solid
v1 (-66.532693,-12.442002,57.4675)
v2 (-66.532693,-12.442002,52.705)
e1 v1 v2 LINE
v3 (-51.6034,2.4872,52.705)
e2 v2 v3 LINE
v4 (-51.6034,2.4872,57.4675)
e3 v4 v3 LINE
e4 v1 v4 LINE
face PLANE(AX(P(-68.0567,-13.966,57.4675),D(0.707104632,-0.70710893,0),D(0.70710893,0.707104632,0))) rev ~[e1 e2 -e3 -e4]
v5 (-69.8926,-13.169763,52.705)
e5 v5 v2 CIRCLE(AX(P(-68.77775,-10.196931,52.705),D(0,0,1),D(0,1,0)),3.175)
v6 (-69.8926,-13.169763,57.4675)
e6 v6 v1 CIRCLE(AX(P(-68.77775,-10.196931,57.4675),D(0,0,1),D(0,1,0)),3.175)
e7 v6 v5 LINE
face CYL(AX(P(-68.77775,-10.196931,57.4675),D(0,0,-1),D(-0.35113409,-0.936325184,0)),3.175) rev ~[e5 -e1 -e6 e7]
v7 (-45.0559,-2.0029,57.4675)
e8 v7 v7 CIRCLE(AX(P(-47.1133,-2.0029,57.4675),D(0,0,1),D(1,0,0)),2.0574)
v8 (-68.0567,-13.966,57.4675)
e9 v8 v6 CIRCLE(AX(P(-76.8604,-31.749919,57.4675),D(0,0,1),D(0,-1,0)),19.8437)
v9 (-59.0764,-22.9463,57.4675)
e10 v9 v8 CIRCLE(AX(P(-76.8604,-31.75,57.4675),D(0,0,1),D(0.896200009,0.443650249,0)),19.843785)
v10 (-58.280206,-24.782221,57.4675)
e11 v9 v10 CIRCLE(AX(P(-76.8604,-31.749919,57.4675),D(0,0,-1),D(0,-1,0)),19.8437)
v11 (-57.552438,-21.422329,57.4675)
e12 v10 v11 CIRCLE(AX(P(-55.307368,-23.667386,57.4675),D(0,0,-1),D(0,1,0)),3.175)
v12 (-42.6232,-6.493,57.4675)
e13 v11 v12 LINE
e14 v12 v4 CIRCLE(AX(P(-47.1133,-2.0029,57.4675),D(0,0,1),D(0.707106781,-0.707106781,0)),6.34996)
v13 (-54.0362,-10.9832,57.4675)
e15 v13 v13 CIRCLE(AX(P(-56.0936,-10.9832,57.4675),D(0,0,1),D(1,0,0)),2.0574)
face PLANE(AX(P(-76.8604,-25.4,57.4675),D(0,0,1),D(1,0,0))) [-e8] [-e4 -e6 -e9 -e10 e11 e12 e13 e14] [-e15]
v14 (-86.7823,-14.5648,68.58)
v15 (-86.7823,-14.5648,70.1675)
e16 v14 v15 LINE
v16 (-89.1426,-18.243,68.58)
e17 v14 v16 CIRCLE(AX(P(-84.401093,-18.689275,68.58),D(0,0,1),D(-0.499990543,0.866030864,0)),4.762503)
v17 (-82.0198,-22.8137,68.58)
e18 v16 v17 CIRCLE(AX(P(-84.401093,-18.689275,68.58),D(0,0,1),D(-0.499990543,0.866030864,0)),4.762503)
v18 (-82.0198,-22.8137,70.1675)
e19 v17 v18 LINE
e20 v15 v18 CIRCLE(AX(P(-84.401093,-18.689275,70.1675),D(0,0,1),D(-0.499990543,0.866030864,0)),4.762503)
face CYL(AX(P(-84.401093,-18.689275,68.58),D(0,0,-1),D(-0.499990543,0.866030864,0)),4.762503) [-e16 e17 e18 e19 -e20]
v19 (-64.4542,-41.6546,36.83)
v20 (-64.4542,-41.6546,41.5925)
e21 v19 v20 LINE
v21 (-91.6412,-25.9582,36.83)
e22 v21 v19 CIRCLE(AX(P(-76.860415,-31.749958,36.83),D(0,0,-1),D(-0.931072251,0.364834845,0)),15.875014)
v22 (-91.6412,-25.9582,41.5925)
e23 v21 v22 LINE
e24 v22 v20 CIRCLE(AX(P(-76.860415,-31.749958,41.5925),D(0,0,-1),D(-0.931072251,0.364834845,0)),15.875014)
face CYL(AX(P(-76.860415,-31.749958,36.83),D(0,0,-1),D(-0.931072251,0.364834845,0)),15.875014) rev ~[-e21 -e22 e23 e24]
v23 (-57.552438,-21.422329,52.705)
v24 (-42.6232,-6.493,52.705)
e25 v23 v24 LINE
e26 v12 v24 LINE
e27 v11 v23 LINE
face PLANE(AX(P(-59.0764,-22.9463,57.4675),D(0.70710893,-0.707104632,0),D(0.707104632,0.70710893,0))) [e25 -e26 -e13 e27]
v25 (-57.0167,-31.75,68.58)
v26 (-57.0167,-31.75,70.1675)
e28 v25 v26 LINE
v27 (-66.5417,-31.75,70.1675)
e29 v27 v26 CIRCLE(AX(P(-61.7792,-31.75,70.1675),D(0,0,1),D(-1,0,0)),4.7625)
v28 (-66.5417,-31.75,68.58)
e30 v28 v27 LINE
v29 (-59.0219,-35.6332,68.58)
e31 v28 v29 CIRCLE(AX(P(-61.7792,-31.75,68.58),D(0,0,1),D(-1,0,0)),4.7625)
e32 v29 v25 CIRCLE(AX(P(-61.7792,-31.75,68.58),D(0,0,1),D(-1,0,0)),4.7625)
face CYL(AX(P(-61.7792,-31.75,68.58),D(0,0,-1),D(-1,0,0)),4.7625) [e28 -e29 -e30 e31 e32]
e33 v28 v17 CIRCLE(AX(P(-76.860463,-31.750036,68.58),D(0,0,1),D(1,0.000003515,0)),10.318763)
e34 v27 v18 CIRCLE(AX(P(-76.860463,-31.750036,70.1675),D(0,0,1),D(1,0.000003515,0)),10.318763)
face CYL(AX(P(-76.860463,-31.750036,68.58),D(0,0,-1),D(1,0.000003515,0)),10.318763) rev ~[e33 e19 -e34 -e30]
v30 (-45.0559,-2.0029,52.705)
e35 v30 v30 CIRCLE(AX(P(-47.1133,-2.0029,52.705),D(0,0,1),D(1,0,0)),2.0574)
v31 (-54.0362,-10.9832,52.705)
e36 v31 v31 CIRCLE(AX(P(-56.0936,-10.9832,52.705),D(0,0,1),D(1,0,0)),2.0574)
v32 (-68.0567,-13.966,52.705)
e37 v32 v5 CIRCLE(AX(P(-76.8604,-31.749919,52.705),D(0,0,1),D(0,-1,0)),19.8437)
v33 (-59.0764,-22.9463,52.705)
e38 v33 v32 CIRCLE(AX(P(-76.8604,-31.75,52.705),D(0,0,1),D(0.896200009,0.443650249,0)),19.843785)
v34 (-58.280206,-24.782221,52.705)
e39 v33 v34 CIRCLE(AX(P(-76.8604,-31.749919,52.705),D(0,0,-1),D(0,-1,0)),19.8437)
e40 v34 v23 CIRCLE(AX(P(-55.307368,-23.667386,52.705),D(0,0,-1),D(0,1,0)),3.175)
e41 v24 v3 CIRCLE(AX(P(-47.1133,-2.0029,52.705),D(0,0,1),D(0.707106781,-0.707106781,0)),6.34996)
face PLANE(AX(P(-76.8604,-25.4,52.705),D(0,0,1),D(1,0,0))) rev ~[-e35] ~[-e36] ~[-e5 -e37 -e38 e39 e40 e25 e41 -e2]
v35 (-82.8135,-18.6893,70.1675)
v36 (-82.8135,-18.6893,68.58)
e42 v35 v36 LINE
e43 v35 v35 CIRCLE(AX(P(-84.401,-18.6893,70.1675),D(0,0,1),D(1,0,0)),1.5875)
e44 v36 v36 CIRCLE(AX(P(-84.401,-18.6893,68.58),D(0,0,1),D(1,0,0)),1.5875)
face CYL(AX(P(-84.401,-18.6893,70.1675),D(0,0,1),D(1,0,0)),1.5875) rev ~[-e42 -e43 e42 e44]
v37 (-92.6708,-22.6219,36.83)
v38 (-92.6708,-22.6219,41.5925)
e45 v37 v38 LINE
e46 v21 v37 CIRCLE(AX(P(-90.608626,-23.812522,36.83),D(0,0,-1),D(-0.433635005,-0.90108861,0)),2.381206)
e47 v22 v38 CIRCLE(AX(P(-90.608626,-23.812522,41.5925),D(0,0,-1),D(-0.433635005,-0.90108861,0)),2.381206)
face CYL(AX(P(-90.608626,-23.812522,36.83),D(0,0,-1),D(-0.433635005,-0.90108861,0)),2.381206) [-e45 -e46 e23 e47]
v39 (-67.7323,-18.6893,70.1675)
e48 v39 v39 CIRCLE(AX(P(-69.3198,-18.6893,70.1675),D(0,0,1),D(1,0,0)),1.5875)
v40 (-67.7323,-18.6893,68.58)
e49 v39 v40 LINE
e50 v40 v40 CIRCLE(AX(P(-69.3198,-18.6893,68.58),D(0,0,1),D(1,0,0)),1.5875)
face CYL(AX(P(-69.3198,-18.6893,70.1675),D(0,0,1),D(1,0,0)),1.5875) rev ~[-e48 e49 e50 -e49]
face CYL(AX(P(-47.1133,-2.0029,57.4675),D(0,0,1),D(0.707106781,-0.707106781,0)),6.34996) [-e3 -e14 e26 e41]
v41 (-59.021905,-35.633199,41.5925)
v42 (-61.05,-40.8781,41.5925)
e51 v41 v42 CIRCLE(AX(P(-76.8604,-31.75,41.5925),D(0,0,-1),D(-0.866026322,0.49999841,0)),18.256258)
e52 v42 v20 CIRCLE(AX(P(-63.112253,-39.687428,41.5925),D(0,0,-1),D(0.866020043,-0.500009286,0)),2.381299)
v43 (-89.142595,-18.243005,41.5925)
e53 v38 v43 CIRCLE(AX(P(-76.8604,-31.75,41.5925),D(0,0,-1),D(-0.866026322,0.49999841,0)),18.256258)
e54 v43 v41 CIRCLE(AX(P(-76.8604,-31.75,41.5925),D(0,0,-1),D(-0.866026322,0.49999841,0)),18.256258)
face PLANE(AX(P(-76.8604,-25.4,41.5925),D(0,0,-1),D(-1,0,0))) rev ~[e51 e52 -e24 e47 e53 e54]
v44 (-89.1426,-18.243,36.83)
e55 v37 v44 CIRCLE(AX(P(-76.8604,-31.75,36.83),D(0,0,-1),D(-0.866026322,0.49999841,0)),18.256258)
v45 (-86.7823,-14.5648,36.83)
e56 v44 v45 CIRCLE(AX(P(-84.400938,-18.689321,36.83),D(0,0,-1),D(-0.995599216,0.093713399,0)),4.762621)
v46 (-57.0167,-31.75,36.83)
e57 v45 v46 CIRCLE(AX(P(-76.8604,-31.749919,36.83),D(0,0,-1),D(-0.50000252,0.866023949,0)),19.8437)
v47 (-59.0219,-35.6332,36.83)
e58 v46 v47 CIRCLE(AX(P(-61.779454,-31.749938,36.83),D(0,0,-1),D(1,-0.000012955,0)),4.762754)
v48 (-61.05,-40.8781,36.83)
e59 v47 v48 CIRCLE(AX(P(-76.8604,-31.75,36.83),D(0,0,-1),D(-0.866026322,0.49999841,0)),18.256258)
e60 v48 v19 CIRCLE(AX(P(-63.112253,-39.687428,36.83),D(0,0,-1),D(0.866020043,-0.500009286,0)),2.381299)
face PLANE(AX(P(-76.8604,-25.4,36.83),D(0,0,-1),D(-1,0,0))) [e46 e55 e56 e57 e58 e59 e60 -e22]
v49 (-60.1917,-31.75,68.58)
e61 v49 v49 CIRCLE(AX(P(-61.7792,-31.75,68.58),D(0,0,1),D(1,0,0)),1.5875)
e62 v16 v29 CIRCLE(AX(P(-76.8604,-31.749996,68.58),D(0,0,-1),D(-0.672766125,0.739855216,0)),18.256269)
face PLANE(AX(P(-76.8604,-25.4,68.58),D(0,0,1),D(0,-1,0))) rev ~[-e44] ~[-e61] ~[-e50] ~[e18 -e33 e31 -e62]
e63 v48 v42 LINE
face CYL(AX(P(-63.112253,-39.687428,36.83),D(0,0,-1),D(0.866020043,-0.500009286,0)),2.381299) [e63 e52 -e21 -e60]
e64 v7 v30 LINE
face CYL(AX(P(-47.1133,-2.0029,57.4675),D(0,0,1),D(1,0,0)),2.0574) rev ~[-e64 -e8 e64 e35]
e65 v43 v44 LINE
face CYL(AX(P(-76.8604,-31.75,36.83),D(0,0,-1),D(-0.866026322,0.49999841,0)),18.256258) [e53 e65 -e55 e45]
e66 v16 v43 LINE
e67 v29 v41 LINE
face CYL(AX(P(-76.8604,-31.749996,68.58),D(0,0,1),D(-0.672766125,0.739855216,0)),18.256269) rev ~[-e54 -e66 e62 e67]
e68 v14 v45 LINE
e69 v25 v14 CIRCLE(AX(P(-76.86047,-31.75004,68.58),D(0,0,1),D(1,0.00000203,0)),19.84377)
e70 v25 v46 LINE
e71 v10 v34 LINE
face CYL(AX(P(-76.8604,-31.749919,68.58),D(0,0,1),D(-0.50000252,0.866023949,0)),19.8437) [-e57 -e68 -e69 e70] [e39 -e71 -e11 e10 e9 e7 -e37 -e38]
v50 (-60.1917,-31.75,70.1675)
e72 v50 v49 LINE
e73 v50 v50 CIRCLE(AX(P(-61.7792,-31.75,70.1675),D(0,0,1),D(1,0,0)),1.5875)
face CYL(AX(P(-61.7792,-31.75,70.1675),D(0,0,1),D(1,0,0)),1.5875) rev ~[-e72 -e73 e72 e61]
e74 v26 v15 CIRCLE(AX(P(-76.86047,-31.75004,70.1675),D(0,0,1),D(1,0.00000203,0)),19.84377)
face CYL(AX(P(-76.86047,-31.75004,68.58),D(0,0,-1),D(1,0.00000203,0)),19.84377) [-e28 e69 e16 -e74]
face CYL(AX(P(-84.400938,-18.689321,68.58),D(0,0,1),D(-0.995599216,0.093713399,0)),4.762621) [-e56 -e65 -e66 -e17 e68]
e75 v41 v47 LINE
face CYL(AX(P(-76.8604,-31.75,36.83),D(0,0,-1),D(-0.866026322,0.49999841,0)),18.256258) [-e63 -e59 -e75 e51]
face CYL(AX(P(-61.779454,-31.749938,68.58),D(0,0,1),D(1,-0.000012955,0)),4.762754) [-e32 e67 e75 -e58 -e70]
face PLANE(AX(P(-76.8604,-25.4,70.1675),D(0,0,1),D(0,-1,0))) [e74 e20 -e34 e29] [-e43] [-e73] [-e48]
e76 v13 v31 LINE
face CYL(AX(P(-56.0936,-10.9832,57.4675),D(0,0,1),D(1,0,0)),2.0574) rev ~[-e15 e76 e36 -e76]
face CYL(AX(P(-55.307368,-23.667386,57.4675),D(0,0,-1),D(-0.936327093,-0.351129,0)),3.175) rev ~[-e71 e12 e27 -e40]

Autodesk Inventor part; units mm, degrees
ref_plane "YZ Plane" through (0, 0, 0) normal (1, 0, 0) x (0, 1, 0)
ref_plane "XZ Plane" through (0, 0, 0) normal (0, 1, 0) x (-1, 0, 0)
ref_plane "Work Plane1" through (-76.8604, -25.4, 68.58) normal (0, 0, 1) x (0, -1, 0)
sketch "Sketch1" plane through (-76.8604, -25.4, 68.58) normal (0, 0, 1) x (0, -1, 0)
  circle A0 centre (-6.7107, -7.5406) radius 1.5875 construction
  circle A1 centre (-6.7107, 7.5406) radius 1.5875 construction
  circle A2 centre (6.35, 15.0812) radius 1.5875 construction
  circle A3 centre (19.4107, 7.5406) radius 1.5875 construction
  circle A4 centre (19.4107, -7.5406) radius 1.5875 construction
  circle A5 centre (6.35, -15.0813) radius 1.5875 construction
  circle A6 centre (15.0813, 0) radius 6.35 construction
  circle A7 centre (6.35, 0) radius 18.2562 construction
  arc A8 (6.35, 19.8437) -> (-10.8352, -9.9219) centre (6.35, 0) ccw
  arc A9 (-10.8352, -9.9219) -> (-2.5863, -5.1594) centre (-6.7107, -7.5406) ccw
  arc A10 (6.35, 10.3187) -> (6.35, 19.8437) centre (6.35, 15.0812) ccw
  arc A11 (6.35, 10.3187) -> (-2.5863, -5.1594) centre (6.35, 0) ccw
  point P0 (-25.4, 76.8604)
  dimension "d0" = 1.5875
extrude "Extrusion1" add sketch "Sketch1" along normal blind 1.5875
sketch "Sketch2" plane through (-76.8604, -25.4, 70.1675) normal (0, 0, 1) x (1, 0, 0)
  circle A0 centre (-7.5406, 6.7107) radius 1.5875 projected
  circle A1 centre (7.5406, 6.7107) radius 1.5875 projected
  circle A2 centre (15.0812, -6.35) radius 1.5875 projected
  point P0 (76.8604, 25.4)
ref_plane "Work Plane2" through (-95.1167, -50.0063, 68.58) normal (0, 0, 1) x (1, 0, 0)
extrude "Extrusion2" cut sketch "Sketch2" against normal up to surface (1.5875 mm away)
sketch "Sketch3" plane through (-76.8604, -25.4, 68.58) normal (0, 0, -1) x (-1, 0, 0)
  circle A0 centre (0, -6.35) radius 18.2562 construction
  circle A1 centre (-7.5406, 6.7107) radius 1.5875 construction
  circle A2 centre (-15.0812, -6.35) radius 1.5875 construction
  circle A3 centre (7.5406, 6.7107) radius 1.5875 construction
  arc A4 (5.1594, 2.5863) -> (-10.3187, -6.35) centre (0, -6.35) ccw construction
  arc A5 (5.1594, 2.5863) -> (9.9219, 10.8352) centre (7.5406, 6.7107) ccw construction
  arc A6 (9.9219, 10.8352) -> (-19.8437, -6.35) centre (0, -6.35) ccw construction
  arc A7 (-19.8437, -6.35) -> (-10.3187, -6.35) centre (-15.0812, -6.35) ccw construction
  arc A8 (-19.8437, -6.35) -> (-10.3187, -6.35) centre (-15.0812, -6.35) ccw construction
  arc A9 (-19.8437, -6.35) -> (-17.8385, -10.2332) centre (-15.0812, -6.35) ccw
  arc A10 (9.9219, 10.8352) -> (-19.8437, -6.35) centre (0, -6.35) ccw
  arc A11 (5.1594, 2.5863) -> (9.9219, 10.8352) centre (7.5406, 6.7107) ccw construction
  arc A12 (12.2822, 7.157) -> (9.9219, 10.8352) centre (7.5406, 6.7107) ccw
  arc A13 (12.2822, 7.157) -> (-17.8385, -10.2332) centre (0, -6.35) ccw
  arc A14 (5.1594, 2.5863) -> (9.9219, 10.8352) centre (7.5406, 6.7107) ccw construction
  point P0 (-76.8604, 25.4)
  point P1 (-17.8385, -2.4668)
  point P2 (5.5563, 11.0402)
extrude "Extrusion3" add sketch "Sketch3" along normal blind 31.75
sketch "Sketch4" plane through (-76.8604, -25.4, 36.83) normal (0, 0, -1) x (-1, 0, 0)
  circle A0 centre (0, -6.35) radius 15.875 construction
  arc A1 (12.2822, 7.157) -> (-17.8385, -10.2332) centre (0, -6.35) ccw construction
  line L0 (0, -6.35) -> (-7.9375, 7.3982) construction
  line L1 (-15.8104, -15.4781) -> (15.8104, 2.7781) construction
  arc A2 (-15.8104, -15.4781) -> (-12.4062, -16.2546) centre (-13.7482, -14.2875) ccw
  arc A3 (14.7808, -0.5582) -> (15.8104, 2.7781) centre (13.7482, 1.5875) ccw
  arc A4 (14.7808, -0.5582) -> (-12.4062, -16.2546) centre (0, -6.35) ccw
  arc A5 (15.8104, 2.7781) -> (-15.8104, -15.4781) centre (0, -6.35) ccw
  circle A6 centre (-7.5406, 6.7107) radius 1.5875 construction
  point P0 (-76.8604, 25.4)
  point P1 (-17.8385, -2.4668)
  point P2 (5.5563, 11.0402)
extrude "Extrusion4" add sketch "Sketch4" against normal blind 4.7625
ref_plane "Work Plane7" through (-76.8604, -25.4, 57.4675) normal (0, 0, 1) x (1, 0, 0)
sketch "Sketch7" plane through (-76.8604, -25.4, 57.4675) normal (0, 0, 1) x (1, 0, 0)
  arc A0 (19.8437, -6.35) -> (-9.9219, 10.8352) centre (0, -6.35) ccw construction
  arc A1 (17.8385, -10.2332) -> (-12.2822, 7.157) centre (0, -6.35) ccw construction
  line L0 (0, -6.35) -> (31.9505, 25.6005) construction
  line L1 (0, -6.35) -> (40.6249, -6.35) construction
  circle A2 centre (20.7668, 14.4168) radius 2.0574
  circle A3 centre (29.7471, 23.3971) radius 2.0574
  arc A4 (28.0319, 2.41) -> (2.9648, 22.8687) centre (0, -6.35) ccw construction
  arc A5 (34.2372, 18.907) -> (25.257, 27.8872) centre (29.7471, 23.3971) ccw
  line L2 (17.784, 2.4537) -> (34.2372, 18.907)
  line L3 (8.8037, 11.434) -> (25.257, 27.8872)
  arc A6 (17.784, 2.4537) -> (8.8037, 11.434) centre (0, -6.35) ccw
  point P0 (76.8604, 25.4)
  dimension "d22" = 45
  dimension "d24" = 4.1148
  dimension "d25" = 4.1148
  dimension "d26" = 12.7
  dimension "d27" = 9.525
  dimension "d29" = 12.7
extrude "Extrusion6" add sketch "Sketch7" against normal blind 4.7625
fillet "Fillet1" radius 3.175 2 edges at (-68.0567, -13.966, 55.0862) (-59.0764, -22.9463, 55.0862)
properties part number "ChasssiPrototypeA2" material "PC/ABS Plastic"
